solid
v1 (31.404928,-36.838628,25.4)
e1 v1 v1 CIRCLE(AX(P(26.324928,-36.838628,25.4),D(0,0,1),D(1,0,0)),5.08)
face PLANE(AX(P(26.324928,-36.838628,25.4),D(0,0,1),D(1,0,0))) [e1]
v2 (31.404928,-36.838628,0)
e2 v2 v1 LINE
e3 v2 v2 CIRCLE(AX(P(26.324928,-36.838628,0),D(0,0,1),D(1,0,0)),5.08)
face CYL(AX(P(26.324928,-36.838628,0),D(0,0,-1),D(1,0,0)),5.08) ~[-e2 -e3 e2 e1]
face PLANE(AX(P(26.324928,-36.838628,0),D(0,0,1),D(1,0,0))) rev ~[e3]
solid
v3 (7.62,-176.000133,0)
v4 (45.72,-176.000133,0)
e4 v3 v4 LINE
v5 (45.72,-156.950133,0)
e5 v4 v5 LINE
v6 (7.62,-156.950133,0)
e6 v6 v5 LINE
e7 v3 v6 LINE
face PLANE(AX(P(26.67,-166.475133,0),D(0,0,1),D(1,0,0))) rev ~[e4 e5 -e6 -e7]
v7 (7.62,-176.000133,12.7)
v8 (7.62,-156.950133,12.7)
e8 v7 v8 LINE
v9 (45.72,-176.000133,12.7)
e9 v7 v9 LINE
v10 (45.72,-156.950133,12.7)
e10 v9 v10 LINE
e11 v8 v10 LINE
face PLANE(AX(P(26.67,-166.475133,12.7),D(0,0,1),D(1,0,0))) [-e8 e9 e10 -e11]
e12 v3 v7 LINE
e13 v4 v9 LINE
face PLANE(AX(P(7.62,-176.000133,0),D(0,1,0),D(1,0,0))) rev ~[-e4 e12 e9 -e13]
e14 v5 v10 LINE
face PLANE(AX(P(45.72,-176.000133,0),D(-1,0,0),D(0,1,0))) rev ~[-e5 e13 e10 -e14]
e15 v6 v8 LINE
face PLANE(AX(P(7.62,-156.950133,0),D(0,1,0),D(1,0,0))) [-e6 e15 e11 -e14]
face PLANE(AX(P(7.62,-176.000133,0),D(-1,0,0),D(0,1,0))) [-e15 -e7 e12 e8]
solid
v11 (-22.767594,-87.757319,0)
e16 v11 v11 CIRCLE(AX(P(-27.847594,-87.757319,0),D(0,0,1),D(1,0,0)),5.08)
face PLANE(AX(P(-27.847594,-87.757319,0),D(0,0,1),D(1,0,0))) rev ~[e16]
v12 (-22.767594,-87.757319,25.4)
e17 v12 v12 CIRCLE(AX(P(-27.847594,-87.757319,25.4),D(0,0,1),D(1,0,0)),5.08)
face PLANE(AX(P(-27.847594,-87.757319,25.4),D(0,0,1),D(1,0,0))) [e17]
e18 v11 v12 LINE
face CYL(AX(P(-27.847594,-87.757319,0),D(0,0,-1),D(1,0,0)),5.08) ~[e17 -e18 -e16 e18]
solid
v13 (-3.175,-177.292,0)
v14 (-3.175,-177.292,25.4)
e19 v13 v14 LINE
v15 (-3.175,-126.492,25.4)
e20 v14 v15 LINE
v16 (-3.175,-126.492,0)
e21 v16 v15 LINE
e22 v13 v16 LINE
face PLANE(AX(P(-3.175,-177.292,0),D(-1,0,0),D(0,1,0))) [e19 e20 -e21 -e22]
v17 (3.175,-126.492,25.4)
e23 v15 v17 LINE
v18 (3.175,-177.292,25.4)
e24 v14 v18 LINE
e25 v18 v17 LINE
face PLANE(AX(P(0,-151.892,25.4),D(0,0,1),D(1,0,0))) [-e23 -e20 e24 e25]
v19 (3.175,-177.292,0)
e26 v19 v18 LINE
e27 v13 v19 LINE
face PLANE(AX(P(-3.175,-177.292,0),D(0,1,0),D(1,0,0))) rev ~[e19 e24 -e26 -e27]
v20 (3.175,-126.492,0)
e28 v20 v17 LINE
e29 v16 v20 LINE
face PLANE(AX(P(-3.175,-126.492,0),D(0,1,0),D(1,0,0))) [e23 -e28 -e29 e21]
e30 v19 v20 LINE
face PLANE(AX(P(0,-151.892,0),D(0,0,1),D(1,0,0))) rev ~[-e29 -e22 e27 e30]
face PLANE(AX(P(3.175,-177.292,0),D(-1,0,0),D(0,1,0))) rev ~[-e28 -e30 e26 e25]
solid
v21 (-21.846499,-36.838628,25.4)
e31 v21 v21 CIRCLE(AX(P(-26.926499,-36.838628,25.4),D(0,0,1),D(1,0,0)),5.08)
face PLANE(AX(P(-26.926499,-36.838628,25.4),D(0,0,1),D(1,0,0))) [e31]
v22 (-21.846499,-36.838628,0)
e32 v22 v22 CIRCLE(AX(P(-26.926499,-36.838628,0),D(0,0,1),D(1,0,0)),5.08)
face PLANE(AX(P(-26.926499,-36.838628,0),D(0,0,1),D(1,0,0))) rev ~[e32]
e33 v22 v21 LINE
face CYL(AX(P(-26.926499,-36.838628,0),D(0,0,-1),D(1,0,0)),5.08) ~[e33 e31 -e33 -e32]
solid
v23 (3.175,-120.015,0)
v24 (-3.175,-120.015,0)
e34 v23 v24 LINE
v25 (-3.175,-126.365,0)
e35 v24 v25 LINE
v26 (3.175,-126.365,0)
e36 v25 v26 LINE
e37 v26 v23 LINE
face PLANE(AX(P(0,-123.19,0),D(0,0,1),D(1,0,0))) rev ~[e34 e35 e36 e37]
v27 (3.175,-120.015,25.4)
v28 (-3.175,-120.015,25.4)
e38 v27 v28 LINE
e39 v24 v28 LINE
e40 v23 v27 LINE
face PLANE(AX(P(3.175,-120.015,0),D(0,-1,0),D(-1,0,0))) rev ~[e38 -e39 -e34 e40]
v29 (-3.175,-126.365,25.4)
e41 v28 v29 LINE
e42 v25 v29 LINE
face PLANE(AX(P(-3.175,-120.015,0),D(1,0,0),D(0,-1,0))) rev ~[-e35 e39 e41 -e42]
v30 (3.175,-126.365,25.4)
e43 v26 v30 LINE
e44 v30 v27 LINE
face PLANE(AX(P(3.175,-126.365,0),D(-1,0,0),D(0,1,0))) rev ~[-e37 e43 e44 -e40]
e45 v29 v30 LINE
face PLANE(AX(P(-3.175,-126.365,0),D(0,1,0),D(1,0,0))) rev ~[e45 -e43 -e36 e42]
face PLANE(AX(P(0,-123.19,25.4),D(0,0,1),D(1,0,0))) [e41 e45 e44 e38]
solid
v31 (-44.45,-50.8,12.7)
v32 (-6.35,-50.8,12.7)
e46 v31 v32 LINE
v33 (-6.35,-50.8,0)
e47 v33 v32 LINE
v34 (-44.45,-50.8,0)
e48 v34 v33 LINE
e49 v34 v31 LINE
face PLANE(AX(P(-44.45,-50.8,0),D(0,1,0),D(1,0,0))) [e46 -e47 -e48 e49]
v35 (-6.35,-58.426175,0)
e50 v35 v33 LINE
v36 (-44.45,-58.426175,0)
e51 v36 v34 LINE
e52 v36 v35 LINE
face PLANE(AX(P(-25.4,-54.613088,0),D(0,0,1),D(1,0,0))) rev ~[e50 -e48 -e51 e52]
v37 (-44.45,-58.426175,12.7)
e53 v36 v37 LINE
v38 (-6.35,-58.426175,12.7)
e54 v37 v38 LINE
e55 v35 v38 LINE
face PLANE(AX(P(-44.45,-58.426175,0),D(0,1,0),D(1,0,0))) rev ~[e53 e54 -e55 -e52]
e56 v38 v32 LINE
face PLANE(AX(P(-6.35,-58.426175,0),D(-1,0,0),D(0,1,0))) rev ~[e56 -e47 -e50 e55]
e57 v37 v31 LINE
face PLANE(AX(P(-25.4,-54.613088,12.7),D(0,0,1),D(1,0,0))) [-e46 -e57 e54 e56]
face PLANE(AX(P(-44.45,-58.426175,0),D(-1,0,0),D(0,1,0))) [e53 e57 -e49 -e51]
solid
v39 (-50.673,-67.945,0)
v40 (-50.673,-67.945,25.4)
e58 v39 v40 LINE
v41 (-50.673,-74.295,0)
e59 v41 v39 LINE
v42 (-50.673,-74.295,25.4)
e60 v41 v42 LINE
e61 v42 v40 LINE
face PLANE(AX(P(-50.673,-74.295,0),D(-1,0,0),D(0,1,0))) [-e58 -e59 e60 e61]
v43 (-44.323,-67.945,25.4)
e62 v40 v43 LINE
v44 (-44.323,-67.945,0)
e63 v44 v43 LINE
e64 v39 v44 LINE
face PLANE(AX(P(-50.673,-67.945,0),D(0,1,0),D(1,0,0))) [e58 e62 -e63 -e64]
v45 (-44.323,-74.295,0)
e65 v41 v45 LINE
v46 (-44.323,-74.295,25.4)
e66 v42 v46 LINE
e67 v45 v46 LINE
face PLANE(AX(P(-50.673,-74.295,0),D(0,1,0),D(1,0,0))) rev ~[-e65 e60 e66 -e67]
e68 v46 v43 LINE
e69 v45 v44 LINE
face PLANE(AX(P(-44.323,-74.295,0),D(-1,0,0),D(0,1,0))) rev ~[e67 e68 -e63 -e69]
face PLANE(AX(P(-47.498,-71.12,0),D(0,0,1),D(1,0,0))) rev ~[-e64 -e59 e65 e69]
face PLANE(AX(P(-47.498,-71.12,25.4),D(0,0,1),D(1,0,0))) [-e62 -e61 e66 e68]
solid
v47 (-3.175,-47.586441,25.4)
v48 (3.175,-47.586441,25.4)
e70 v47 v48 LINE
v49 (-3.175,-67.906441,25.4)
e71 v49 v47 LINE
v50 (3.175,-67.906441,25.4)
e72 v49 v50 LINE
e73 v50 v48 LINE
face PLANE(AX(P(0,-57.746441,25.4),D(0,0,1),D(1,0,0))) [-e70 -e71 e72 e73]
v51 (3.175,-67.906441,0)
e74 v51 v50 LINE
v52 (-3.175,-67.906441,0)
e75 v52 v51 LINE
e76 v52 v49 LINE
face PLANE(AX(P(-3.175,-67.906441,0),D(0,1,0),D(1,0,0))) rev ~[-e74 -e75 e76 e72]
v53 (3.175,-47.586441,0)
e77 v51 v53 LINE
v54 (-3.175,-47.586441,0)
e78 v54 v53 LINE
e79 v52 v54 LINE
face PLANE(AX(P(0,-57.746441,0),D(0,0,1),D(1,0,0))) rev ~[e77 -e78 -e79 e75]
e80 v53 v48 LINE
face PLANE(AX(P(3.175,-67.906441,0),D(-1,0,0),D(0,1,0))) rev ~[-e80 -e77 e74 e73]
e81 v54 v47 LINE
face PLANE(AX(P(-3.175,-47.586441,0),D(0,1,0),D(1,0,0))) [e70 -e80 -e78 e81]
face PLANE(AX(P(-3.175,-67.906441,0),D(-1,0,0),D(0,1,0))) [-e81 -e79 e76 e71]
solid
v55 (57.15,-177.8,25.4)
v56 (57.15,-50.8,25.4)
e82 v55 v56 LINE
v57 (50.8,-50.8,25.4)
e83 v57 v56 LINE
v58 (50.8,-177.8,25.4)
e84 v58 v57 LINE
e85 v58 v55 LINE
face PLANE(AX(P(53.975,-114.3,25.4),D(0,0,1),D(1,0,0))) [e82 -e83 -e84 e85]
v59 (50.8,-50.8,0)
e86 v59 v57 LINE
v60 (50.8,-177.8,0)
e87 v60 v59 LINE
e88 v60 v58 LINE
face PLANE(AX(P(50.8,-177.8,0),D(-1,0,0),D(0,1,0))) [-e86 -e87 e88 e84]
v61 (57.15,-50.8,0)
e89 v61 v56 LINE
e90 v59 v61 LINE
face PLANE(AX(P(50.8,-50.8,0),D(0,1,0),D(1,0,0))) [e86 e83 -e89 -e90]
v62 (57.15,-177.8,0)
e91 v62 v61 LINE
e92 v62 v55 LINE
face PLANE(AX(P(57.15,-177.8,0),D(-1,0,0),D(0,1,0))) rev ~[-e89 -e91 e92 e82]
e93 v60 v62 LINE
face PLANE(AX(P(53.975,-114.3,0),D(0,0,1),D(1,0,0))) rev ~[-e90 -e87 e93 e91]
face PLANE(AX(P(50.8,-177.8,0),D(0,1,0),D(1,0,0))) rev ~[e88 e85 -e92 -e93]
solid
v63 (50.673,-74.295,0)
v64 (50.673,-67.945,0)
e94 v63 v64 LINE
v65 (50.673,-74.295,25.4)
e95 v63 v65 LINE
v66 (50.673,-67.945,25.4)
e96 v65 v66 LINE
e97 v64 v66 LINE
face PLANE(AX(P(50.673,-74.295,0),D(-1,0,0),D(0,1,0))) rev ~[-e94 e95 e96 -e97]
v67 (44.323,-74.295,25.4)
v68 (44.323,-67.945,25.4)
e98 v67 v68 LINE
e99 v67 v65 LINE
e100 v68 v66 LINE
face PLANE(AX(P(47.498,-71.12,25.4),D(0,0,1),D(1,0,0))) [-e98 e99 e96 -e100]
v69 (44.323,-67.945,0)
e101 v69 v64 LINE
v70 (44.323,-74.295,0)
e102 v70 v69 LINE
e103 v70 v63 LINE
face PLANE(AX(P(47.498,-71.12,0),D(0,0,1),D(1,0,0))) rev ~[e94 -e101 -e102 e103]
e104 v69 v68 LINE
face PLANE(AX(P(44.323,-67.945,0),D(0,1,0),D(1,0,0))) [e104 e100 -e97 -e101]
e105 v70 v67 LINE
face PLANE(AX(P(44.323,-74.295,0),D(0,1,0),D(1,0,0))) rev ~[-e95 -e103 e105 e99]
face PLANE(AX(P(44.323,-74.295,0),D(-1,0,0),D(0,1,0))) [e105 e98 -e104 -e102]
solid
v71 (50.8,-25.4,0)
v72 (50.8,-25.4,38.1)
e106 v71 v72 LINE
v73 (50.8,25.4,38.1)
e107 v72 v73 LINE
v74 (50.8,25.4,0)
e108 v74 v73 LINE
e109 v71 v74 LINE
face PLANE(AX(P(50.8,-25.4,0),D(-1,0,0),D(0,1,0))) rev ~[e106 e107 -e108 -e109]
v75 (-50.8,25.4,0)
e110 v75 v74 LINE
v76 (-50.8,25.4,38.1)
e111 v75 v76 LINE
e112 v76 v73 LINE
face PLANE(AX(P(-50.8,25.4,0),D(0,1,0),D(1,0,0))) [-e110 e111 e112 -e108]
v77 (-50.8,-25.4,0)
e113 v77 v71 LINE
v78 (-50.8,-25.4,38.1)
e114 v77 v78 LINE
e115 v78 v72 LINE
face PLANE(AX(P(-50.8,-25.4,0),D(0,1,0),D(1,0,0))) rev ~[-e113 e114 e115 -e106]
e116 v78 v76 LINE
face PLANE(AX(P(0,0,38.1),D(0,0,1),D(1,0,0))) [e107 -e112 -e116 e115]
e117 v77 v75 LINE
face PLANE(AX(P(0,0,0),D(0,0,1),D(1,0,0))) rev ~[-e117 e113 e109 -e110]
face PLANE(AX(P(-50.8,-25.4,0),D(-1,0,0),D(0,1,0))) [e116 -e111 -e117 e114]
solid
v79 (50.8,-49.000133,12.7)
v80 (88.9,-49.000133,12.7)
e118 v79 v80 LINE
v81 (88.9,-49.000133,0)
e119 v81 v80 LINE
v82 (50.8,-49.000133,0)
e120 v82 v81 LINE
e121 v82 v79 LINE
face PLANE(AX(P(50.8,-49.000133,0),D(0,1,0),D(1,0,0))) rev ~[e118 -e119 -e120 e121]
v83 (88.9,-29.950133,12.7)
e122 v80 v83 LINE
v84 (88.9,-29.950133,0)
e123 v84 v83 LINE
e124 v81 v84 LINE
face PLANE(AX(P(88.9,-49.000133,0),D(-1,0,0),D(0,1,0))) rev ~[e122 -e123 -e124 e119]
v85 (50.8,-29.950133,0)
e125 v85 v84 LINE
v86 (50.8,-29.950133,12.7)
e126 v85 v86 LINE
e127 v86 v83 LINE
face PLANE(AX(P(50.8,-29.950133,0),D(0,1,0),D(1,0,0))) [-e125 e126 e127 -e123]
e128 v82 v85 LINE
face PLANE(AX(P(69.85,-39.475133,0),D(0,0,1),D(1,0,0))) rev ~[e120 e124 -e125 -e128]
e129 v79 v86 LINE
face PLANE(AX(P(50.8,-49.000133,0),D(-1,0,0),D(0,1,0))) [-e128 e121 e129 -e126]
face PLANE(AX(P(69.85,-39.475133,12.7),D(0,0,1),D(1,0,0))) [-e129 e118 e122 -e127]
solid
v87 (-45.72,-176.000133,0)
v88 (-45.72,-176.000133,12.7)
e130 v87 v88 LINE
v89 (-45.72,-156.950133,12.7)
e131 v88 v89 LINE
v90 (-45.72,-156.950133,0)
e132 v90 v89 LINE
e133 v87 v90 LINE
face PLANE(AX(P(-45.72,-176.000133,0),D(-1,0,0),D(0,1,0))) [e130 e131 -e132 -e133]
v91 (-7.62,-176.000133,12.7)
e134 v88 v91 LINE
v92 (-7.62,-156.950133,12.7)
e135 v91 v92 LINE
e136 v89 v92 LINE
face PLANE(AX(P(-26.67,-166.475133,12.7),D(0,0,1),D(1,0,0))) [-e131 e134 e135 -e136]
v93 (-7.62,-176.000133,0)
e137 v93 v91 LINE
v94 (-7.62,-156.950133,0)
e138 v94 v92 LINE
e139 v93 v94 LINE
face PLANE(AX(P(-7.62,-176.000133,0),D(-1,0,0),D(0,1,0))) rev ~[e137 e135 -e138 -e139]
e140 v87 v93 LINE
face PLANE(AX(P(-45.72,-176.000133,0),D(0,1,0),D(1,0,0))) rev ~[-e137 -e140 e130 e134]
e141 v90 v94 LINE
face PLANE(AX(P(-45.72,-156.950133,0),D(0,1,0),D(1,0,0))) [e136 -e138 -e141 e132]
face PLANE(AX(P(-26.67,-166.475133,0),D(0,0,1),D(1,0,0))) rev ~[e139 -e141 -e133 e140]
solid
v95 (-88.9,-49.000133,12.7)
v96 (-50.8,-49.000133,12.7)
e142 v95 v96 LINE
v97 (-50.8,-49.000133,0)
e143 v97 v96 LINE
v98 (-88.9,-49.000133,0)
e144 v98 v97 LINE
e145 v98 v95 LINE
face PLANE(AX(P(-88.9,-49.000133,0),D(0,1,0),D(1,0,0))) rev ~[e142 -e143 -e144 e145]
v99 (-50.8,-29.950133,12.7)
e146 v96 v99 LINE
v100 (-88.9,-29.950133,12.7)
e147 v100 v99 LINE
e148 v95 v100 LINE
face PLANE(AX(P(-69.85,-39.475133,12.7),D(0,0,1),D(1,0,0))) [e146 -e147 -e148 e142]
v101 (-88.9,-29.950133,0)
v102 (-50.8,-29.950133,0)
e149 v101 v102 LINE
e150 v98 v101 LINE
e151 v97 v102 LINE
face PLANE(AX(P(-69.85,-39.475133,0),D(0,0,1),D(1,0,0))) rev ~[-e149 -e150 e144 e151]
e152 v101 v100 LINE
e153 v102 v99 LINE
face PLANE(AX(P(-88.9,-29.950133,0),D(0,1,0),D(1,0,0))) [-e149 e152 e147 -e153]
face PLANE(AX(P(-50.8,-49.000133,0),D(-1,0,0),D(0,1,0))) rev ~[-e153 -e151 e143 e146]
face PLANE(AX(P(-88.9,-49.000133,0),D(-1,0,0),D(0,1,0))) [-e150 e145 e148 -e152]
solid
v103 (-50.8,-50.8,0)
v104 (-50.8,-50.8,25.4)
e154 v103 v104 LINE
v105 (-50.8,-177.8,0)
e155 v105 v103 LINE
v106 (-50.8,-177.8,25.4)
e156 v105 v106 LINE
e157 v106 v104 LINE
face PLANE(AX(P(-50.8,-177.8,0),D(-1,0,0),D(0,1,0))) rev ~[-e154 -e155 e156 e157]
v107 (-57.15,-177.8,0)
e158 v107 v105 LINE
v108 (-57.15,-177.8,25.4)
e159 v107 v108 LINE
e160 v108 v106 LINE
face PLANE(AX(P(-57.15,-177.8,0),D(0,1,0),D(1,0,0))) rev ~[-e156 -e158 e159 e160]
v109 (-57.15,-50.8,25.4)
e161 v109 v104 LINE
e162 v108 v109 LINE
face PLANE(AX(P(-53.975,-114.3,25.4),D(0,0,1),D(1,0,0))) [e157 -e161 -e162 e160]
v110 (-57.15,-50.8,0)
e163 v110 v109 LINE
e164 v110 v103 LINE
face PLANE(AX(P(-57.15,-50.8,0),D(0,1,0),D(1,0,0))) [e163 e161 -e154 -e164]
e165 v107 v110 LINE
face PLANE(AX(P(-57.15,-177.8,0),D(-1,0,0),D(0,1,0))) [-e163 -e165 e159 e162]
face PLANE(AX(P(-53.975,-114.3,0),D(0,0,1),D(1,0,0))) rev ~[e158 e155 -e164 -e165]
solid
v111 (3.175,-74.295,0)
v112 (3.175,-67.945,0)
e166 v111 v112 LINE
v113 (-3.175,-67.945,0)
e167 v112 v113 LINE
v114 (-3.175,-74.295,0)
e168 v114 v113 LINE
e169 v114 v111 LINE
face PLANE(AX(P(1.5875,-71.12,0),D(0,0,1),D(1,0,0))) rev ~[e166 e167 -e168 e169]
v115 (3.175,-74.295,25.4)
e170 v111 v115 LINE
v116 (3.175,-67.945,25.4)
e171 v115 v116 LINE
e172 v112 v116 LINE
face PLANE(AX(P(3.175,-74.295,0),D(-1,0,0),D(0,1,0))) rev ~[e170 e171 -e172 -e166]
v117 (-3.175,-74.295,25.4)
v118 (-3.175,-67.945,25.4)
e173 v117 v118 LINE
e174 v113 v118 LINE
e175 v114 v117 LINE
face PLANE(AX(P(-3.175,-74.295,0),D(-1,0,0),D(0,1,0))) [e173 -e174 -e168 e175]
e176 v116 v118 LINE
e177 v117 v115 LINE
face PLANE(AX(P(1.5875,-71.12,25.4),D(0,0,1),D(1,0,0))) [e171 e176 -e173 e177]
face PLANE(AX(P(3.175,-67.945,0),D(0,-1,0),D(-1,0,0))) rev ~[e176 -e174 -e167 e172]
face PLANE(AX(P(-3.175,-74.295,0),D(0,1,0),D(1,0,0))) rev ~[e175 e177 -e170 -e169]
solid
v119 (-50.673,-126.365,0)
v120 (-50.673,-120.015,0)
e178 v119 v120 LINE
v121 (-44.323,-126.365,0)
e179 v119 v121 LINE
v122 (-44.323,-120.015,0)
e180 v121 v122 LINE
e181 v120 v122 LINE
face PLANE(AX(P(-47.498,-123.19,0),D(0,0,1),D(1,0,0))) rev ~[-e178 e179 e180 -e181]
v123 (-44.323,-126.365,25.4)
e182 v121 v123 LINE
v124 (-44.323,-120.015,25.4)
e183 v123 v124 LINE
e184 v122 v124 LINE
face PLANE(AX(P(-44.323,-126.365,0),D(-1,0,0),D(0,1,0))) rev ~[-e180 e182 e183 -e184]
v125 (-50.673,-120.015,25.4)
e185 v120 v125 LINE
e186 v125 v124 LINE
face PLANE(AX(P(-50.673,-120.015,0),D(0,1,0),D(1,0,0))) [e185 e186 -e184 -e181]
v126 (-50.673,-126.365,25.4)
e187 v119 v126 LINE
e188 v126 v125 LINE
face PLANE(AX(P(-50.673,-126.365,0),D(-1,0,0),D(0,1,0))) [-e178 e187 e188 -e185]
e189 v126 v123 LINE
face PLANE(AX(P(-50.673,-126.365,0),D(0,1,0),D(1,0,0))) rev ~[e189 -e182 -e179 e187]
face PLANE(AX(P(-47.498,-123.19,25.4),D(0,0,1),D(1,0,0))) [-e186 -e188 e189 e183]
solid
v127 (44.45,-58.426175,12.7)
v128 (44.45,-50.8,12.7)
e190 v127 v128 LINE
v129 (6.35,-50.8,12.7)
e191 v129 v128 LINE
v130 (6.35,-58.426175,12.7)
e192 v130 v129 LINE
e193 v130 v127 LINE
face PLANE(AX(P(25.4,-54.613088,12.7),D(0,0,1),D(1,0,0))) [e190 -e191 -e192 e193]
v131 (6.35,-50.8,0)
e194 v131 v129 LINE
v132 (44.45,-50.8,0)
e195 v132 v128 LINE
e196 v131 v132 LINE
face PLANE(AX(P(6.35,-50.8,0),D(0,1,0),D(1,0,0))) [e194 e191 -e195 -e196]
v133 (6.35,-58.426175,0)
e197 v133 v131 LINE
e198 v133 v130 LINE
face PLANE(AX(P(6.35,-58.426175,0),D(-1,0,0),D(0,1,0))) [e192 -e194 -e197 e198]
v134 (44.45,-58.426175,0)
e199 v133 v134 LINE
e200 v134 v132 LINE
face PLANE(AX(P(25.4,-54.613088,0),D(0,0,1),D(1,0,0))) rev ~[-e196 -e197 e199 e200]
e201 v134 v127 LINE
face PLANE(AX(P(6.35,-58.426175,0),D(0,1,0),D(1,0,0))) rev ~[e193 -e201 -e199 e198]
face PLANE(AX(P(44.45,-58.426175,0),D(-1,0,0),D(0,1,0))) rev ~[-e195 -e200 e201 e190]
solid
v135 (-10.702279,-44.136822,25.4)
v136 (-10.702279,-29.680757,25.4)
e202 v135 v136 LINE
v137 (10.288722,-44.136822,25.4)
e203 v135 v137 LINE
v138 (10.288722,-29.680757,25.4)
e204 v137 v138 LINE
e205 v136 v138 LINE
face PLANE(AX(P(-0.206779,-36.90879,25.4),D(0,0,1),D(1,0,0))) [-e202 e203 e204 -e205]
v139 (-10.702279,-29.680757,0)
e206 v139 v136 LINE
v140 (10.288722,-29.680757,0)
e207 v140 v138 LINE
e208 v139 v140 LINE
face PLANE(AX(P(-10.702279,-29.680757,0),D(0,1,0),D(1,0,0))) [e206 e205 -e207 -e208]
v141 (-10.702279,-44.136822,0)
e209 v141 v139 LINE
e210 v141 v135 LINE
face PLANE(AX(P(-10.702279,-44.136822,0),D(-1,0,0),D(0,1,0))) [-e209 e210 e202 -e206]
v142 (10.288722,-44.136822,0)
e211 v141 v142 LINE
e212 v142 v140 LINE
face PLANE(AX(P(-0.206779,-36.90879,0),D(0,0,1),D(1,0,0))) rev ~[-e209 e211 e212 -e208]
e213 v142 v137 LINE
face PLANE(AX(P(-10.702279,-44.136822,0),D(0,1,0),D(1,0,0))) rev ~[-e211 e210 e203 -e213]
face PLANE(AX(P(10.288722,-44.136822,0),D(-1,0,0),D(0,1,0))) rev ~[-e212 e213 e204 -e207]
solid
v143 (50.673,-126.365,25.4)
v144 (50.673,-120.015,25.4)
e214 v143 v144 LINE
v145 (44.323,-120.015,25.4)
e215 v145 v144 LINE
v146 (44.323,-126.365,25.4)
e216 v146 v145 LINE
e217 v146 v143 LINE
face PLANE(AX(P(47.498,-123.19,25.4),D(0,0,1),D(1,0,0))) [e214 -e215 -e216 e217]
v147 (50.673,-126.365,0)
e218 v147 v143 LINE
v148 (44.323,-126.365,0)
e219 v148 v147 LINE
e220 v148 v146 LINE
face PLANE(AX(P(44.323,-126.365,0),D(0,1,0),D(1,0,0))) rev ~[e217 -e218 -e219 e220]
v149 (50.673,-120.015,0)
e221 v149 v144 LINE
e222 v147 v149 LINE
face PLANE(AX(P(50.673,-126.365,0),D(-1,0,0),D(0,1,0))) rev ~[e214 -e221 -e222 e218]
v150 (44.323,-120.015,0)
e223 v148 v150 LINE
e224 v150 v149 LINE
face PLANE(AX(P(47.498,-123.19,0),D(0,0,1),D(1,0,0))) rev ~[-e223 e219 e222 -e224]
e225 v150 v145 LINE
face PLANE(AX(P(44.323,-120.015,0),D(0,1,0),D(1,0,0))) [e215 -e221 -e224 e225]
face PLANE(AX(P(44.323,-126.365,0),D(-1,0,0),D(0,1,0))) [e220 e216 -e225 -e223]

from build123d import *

# Parameters (mm, degrees)
F0_W      = 101.6
F0_H      = 50.8
F1_DEPTH  = 38.1
F2_W      = 38.1
F2_H      = 7.6261752665
F3_DEPTH  = 12.7
F4_W      = 6.35
F4_H      = 20.32
F5_DEPTH  = 25.4
F6_W      = 6.35
F6_H      = 127
F7_DEPTH  = 25.4
F8_W      = 3.175
F8_H      = 6.35
F9_DEPTH  = 25.4
F8_W_2    = 6.35
F10_W     = 6.35
F10_H     = 50.8
F12_DEPTH = 25.4
F13_W     = 38.1
F13_H     = 19.05
F14_DEPTH = 12.7
F15_R     = 5.08
F16_DEPTH = 25.4
F17_W     = 20.9910012782
F17_H     = 14.4560653716
F18_DEPTH = 25.4


# Not quite as in the source:
# - the program builds the solid bodies; features that only make, move or delete a surface that nothing else refers to are left out


with BuildPart() as f1:
    # F0 (on Top) → F1 (new body)
    with BuildSketch(Plane.XY):
        Rectangle(F0_W, F0_H)
    extrude(amount=F1_DEPTH)


with BuildPart() as f3:
    # F2 (on Top) → F3 (new body)
    with BuildSketch(Plane.XY):
        with Locations((-25.4, -54.6130876333)):
            Rectangle(F2_W, F2_H)
    extrude(amount=F3_DEPTH)


with BuildPart() as f3b:
    # F2 (on Top) → F3, piece 2 (new body)
    with BuildSketch(Plane.XY):
        with Locations((25.4, -54.6130876333)):
            Rectangle(F2_W, F2_H)
    extrude(amount=F3_DEPTH)


with BuildPart() as f5:
    # F4 (on Top) → F5 (new body)
    with BuildSketch(Plane.XY):
        with Locations((0, -57.74644104)):
            Rectangle(F4_W, F4_H)
    extrude(amount=F5_DEPTH)


with BuildPart() as f7:
    # F6 (on Top) → F7 (new body)
    with BuildSketch(Plane.XY):
        with Locations((-53.975, -114.3)):
            Rectangle(F6_W, F6_H)
    extrude(amount=F7_DEPTH)


with BuildPart() as f7b:
    # F6 (on Top) → F7, piece 2 (new body)
    with BuildSketch(Plane.XY):
        with Locations((53.975, -114.3)):
            Rectangle(F6_W, F6_H)
    extrude(amount=F7_DEPTH)


with BuildPart() as f9:
    # F8 (on Top) → F9 (new body)
    with BuildSketch(Plane.XY):
        with Locations((1.5875, -71.12)):
            Rectangle(F8_W, F8_H)
        with Locations((-1.5875, -71.12)):
            Rectangle(F8_W, F8_H)
    extrude(amount=F9_DEPTH)


with BuildPart() as f9b:
    # F8 (on Top) → F9, piece 2 (new body)
    with BuildSketch(Plane.XY):
        with Locations((47.498, -71.12)):
            Rectangle(F8_W_2, F8_H)
    extrude(amount=F9_DEPTH)


with BuildPart() as f9c:
    # F8 (on Top) → F9, piece 3 (new body)
    with BuildSketch(Plane.XY):
        with Locations((-47.498, -71.12)):
            Rectangle(F8_W_2, F8_H)
    extrude(amount=F9_DEPTH)


with BuildPart() as f9d:
    # F8 (on Top) → F9, piece 4 (new body)
    with BuildSketch(Plane.XY):
        with Locations((47.498, -123.19)):
            Rectangle(F8_W_2, F8_H)
    extrude(amount=F9_DEPTH)


with BuildPart() as f9e:
    # F8 (on Top) → F9, piece 5 (new body)
    with BuildSketch(Plane.XY):
        Polygon((0, -126.365), (3.175, -126.365), (3.175, -120.015), (0, -120.015), (-3.175, -120.015), (-3.175, -126.365), align=None)
    extrude(amount=F9_DEPTH)


with BuildPart() as f9f:
    # F8 (on Top) → F9, piece 6 (new body)
    with BuildSketch(Plane.XY):
        with Locations((-47.498, -123.19)):
            Rectangle(F8_W_2, F8_H)
    extrude(amount=F9_DEPTH)


with BuildPart() as f12:
    # F10 (on Top) → F12 (new body)
    with BuildSketch(Plane.XY):
        with Locations((0, -151.892)):
            Rectangle(F10_W, F10_H)
    extrude(amount=F12_DEPTH)


with BuildPart() as f14:
    # F13 (on Top) → F14 (new body)
    with BuildSketch(Plane.XY):
        with Locations((-69.85, -39.475132829)):
            Rectangle(F13_W, F13_H)
    extrude(amount=F14_DEPTH)


with BuildPart() as f14b:
    # F13 (on Top) → F14, piece 2 (new body)
    with BuildSketch(Plane.XY):
        with Locations((69.85, -39.475132829)):
            Rectangle(F13_W, F13_H)
    extrude(amount=F14_DEPTH)


with BuildPart() as f14c:
    # F13 (on Top) → F14, piece 3 (new body)
    with BuildSketch(Plane.XY):
        with Locations((26.67, -166.475132829)):
            Rectangle(F13_W, F13_H)
    extrude(amount=F14_DEPTH)


with BuildPart() as f14d:
    # F13 (on Top) → F14, piece 4 (new body)
    with BuildSketch(Plane.XY):
        with Locations((-26.67, -166.475132829)):
            Rectangle(F13_W, F13_H)
    extrude(amount=F14_DEPTH)


with BuildPart() as f16:
    # F15 (on Top) → F16 (new body)
    with BuildSketch(Plane.XY):
        with Locations((-27.8475936502, -87.757319212)):
            Circle(F15_R)
    extrude(amount=F16_DEPTH)


with BuildPart() as f16b:
    # F15 (on Top) → F16, piece 2 (new body)
    with BuildSketch(Plane.XY):
        with Locations((-26.9264988601, -36.8386283517)):
            Circle(F15_R)
    extrude(amount=F16_DEPTH)


with BuildPart() as f16c:
    # F15 (on Top) → F16, piece 3 (new body)
    with BuildSketch(Plane.XY):
        with Locations((26.3249278069, -36.8386283517)):
            Circle(F15_R)
    extrude(amount=F16_DEPTH)


with BuildPart() as f18:
    # F17 (on Top) → F18 (new body)
    with BuildSketch(Plane.XY):
        with Locations((-0.2067787573, -36.9087895378)):
            Rectangle(F17_W, F17_H)
    extrude(amount=F18_DEPTH)


solid = Compound([f1.part, f3.part, f3b.part, f5.part, f7.part, f7b.part, f9.part, f9b.part, f9c.part, f9d.part, f9e.part, f9f.part, f12.part, f14.part, f14b.part, f14c.part, f14d.part, f16.part, f16b.part, f16c.part, f18.part])
